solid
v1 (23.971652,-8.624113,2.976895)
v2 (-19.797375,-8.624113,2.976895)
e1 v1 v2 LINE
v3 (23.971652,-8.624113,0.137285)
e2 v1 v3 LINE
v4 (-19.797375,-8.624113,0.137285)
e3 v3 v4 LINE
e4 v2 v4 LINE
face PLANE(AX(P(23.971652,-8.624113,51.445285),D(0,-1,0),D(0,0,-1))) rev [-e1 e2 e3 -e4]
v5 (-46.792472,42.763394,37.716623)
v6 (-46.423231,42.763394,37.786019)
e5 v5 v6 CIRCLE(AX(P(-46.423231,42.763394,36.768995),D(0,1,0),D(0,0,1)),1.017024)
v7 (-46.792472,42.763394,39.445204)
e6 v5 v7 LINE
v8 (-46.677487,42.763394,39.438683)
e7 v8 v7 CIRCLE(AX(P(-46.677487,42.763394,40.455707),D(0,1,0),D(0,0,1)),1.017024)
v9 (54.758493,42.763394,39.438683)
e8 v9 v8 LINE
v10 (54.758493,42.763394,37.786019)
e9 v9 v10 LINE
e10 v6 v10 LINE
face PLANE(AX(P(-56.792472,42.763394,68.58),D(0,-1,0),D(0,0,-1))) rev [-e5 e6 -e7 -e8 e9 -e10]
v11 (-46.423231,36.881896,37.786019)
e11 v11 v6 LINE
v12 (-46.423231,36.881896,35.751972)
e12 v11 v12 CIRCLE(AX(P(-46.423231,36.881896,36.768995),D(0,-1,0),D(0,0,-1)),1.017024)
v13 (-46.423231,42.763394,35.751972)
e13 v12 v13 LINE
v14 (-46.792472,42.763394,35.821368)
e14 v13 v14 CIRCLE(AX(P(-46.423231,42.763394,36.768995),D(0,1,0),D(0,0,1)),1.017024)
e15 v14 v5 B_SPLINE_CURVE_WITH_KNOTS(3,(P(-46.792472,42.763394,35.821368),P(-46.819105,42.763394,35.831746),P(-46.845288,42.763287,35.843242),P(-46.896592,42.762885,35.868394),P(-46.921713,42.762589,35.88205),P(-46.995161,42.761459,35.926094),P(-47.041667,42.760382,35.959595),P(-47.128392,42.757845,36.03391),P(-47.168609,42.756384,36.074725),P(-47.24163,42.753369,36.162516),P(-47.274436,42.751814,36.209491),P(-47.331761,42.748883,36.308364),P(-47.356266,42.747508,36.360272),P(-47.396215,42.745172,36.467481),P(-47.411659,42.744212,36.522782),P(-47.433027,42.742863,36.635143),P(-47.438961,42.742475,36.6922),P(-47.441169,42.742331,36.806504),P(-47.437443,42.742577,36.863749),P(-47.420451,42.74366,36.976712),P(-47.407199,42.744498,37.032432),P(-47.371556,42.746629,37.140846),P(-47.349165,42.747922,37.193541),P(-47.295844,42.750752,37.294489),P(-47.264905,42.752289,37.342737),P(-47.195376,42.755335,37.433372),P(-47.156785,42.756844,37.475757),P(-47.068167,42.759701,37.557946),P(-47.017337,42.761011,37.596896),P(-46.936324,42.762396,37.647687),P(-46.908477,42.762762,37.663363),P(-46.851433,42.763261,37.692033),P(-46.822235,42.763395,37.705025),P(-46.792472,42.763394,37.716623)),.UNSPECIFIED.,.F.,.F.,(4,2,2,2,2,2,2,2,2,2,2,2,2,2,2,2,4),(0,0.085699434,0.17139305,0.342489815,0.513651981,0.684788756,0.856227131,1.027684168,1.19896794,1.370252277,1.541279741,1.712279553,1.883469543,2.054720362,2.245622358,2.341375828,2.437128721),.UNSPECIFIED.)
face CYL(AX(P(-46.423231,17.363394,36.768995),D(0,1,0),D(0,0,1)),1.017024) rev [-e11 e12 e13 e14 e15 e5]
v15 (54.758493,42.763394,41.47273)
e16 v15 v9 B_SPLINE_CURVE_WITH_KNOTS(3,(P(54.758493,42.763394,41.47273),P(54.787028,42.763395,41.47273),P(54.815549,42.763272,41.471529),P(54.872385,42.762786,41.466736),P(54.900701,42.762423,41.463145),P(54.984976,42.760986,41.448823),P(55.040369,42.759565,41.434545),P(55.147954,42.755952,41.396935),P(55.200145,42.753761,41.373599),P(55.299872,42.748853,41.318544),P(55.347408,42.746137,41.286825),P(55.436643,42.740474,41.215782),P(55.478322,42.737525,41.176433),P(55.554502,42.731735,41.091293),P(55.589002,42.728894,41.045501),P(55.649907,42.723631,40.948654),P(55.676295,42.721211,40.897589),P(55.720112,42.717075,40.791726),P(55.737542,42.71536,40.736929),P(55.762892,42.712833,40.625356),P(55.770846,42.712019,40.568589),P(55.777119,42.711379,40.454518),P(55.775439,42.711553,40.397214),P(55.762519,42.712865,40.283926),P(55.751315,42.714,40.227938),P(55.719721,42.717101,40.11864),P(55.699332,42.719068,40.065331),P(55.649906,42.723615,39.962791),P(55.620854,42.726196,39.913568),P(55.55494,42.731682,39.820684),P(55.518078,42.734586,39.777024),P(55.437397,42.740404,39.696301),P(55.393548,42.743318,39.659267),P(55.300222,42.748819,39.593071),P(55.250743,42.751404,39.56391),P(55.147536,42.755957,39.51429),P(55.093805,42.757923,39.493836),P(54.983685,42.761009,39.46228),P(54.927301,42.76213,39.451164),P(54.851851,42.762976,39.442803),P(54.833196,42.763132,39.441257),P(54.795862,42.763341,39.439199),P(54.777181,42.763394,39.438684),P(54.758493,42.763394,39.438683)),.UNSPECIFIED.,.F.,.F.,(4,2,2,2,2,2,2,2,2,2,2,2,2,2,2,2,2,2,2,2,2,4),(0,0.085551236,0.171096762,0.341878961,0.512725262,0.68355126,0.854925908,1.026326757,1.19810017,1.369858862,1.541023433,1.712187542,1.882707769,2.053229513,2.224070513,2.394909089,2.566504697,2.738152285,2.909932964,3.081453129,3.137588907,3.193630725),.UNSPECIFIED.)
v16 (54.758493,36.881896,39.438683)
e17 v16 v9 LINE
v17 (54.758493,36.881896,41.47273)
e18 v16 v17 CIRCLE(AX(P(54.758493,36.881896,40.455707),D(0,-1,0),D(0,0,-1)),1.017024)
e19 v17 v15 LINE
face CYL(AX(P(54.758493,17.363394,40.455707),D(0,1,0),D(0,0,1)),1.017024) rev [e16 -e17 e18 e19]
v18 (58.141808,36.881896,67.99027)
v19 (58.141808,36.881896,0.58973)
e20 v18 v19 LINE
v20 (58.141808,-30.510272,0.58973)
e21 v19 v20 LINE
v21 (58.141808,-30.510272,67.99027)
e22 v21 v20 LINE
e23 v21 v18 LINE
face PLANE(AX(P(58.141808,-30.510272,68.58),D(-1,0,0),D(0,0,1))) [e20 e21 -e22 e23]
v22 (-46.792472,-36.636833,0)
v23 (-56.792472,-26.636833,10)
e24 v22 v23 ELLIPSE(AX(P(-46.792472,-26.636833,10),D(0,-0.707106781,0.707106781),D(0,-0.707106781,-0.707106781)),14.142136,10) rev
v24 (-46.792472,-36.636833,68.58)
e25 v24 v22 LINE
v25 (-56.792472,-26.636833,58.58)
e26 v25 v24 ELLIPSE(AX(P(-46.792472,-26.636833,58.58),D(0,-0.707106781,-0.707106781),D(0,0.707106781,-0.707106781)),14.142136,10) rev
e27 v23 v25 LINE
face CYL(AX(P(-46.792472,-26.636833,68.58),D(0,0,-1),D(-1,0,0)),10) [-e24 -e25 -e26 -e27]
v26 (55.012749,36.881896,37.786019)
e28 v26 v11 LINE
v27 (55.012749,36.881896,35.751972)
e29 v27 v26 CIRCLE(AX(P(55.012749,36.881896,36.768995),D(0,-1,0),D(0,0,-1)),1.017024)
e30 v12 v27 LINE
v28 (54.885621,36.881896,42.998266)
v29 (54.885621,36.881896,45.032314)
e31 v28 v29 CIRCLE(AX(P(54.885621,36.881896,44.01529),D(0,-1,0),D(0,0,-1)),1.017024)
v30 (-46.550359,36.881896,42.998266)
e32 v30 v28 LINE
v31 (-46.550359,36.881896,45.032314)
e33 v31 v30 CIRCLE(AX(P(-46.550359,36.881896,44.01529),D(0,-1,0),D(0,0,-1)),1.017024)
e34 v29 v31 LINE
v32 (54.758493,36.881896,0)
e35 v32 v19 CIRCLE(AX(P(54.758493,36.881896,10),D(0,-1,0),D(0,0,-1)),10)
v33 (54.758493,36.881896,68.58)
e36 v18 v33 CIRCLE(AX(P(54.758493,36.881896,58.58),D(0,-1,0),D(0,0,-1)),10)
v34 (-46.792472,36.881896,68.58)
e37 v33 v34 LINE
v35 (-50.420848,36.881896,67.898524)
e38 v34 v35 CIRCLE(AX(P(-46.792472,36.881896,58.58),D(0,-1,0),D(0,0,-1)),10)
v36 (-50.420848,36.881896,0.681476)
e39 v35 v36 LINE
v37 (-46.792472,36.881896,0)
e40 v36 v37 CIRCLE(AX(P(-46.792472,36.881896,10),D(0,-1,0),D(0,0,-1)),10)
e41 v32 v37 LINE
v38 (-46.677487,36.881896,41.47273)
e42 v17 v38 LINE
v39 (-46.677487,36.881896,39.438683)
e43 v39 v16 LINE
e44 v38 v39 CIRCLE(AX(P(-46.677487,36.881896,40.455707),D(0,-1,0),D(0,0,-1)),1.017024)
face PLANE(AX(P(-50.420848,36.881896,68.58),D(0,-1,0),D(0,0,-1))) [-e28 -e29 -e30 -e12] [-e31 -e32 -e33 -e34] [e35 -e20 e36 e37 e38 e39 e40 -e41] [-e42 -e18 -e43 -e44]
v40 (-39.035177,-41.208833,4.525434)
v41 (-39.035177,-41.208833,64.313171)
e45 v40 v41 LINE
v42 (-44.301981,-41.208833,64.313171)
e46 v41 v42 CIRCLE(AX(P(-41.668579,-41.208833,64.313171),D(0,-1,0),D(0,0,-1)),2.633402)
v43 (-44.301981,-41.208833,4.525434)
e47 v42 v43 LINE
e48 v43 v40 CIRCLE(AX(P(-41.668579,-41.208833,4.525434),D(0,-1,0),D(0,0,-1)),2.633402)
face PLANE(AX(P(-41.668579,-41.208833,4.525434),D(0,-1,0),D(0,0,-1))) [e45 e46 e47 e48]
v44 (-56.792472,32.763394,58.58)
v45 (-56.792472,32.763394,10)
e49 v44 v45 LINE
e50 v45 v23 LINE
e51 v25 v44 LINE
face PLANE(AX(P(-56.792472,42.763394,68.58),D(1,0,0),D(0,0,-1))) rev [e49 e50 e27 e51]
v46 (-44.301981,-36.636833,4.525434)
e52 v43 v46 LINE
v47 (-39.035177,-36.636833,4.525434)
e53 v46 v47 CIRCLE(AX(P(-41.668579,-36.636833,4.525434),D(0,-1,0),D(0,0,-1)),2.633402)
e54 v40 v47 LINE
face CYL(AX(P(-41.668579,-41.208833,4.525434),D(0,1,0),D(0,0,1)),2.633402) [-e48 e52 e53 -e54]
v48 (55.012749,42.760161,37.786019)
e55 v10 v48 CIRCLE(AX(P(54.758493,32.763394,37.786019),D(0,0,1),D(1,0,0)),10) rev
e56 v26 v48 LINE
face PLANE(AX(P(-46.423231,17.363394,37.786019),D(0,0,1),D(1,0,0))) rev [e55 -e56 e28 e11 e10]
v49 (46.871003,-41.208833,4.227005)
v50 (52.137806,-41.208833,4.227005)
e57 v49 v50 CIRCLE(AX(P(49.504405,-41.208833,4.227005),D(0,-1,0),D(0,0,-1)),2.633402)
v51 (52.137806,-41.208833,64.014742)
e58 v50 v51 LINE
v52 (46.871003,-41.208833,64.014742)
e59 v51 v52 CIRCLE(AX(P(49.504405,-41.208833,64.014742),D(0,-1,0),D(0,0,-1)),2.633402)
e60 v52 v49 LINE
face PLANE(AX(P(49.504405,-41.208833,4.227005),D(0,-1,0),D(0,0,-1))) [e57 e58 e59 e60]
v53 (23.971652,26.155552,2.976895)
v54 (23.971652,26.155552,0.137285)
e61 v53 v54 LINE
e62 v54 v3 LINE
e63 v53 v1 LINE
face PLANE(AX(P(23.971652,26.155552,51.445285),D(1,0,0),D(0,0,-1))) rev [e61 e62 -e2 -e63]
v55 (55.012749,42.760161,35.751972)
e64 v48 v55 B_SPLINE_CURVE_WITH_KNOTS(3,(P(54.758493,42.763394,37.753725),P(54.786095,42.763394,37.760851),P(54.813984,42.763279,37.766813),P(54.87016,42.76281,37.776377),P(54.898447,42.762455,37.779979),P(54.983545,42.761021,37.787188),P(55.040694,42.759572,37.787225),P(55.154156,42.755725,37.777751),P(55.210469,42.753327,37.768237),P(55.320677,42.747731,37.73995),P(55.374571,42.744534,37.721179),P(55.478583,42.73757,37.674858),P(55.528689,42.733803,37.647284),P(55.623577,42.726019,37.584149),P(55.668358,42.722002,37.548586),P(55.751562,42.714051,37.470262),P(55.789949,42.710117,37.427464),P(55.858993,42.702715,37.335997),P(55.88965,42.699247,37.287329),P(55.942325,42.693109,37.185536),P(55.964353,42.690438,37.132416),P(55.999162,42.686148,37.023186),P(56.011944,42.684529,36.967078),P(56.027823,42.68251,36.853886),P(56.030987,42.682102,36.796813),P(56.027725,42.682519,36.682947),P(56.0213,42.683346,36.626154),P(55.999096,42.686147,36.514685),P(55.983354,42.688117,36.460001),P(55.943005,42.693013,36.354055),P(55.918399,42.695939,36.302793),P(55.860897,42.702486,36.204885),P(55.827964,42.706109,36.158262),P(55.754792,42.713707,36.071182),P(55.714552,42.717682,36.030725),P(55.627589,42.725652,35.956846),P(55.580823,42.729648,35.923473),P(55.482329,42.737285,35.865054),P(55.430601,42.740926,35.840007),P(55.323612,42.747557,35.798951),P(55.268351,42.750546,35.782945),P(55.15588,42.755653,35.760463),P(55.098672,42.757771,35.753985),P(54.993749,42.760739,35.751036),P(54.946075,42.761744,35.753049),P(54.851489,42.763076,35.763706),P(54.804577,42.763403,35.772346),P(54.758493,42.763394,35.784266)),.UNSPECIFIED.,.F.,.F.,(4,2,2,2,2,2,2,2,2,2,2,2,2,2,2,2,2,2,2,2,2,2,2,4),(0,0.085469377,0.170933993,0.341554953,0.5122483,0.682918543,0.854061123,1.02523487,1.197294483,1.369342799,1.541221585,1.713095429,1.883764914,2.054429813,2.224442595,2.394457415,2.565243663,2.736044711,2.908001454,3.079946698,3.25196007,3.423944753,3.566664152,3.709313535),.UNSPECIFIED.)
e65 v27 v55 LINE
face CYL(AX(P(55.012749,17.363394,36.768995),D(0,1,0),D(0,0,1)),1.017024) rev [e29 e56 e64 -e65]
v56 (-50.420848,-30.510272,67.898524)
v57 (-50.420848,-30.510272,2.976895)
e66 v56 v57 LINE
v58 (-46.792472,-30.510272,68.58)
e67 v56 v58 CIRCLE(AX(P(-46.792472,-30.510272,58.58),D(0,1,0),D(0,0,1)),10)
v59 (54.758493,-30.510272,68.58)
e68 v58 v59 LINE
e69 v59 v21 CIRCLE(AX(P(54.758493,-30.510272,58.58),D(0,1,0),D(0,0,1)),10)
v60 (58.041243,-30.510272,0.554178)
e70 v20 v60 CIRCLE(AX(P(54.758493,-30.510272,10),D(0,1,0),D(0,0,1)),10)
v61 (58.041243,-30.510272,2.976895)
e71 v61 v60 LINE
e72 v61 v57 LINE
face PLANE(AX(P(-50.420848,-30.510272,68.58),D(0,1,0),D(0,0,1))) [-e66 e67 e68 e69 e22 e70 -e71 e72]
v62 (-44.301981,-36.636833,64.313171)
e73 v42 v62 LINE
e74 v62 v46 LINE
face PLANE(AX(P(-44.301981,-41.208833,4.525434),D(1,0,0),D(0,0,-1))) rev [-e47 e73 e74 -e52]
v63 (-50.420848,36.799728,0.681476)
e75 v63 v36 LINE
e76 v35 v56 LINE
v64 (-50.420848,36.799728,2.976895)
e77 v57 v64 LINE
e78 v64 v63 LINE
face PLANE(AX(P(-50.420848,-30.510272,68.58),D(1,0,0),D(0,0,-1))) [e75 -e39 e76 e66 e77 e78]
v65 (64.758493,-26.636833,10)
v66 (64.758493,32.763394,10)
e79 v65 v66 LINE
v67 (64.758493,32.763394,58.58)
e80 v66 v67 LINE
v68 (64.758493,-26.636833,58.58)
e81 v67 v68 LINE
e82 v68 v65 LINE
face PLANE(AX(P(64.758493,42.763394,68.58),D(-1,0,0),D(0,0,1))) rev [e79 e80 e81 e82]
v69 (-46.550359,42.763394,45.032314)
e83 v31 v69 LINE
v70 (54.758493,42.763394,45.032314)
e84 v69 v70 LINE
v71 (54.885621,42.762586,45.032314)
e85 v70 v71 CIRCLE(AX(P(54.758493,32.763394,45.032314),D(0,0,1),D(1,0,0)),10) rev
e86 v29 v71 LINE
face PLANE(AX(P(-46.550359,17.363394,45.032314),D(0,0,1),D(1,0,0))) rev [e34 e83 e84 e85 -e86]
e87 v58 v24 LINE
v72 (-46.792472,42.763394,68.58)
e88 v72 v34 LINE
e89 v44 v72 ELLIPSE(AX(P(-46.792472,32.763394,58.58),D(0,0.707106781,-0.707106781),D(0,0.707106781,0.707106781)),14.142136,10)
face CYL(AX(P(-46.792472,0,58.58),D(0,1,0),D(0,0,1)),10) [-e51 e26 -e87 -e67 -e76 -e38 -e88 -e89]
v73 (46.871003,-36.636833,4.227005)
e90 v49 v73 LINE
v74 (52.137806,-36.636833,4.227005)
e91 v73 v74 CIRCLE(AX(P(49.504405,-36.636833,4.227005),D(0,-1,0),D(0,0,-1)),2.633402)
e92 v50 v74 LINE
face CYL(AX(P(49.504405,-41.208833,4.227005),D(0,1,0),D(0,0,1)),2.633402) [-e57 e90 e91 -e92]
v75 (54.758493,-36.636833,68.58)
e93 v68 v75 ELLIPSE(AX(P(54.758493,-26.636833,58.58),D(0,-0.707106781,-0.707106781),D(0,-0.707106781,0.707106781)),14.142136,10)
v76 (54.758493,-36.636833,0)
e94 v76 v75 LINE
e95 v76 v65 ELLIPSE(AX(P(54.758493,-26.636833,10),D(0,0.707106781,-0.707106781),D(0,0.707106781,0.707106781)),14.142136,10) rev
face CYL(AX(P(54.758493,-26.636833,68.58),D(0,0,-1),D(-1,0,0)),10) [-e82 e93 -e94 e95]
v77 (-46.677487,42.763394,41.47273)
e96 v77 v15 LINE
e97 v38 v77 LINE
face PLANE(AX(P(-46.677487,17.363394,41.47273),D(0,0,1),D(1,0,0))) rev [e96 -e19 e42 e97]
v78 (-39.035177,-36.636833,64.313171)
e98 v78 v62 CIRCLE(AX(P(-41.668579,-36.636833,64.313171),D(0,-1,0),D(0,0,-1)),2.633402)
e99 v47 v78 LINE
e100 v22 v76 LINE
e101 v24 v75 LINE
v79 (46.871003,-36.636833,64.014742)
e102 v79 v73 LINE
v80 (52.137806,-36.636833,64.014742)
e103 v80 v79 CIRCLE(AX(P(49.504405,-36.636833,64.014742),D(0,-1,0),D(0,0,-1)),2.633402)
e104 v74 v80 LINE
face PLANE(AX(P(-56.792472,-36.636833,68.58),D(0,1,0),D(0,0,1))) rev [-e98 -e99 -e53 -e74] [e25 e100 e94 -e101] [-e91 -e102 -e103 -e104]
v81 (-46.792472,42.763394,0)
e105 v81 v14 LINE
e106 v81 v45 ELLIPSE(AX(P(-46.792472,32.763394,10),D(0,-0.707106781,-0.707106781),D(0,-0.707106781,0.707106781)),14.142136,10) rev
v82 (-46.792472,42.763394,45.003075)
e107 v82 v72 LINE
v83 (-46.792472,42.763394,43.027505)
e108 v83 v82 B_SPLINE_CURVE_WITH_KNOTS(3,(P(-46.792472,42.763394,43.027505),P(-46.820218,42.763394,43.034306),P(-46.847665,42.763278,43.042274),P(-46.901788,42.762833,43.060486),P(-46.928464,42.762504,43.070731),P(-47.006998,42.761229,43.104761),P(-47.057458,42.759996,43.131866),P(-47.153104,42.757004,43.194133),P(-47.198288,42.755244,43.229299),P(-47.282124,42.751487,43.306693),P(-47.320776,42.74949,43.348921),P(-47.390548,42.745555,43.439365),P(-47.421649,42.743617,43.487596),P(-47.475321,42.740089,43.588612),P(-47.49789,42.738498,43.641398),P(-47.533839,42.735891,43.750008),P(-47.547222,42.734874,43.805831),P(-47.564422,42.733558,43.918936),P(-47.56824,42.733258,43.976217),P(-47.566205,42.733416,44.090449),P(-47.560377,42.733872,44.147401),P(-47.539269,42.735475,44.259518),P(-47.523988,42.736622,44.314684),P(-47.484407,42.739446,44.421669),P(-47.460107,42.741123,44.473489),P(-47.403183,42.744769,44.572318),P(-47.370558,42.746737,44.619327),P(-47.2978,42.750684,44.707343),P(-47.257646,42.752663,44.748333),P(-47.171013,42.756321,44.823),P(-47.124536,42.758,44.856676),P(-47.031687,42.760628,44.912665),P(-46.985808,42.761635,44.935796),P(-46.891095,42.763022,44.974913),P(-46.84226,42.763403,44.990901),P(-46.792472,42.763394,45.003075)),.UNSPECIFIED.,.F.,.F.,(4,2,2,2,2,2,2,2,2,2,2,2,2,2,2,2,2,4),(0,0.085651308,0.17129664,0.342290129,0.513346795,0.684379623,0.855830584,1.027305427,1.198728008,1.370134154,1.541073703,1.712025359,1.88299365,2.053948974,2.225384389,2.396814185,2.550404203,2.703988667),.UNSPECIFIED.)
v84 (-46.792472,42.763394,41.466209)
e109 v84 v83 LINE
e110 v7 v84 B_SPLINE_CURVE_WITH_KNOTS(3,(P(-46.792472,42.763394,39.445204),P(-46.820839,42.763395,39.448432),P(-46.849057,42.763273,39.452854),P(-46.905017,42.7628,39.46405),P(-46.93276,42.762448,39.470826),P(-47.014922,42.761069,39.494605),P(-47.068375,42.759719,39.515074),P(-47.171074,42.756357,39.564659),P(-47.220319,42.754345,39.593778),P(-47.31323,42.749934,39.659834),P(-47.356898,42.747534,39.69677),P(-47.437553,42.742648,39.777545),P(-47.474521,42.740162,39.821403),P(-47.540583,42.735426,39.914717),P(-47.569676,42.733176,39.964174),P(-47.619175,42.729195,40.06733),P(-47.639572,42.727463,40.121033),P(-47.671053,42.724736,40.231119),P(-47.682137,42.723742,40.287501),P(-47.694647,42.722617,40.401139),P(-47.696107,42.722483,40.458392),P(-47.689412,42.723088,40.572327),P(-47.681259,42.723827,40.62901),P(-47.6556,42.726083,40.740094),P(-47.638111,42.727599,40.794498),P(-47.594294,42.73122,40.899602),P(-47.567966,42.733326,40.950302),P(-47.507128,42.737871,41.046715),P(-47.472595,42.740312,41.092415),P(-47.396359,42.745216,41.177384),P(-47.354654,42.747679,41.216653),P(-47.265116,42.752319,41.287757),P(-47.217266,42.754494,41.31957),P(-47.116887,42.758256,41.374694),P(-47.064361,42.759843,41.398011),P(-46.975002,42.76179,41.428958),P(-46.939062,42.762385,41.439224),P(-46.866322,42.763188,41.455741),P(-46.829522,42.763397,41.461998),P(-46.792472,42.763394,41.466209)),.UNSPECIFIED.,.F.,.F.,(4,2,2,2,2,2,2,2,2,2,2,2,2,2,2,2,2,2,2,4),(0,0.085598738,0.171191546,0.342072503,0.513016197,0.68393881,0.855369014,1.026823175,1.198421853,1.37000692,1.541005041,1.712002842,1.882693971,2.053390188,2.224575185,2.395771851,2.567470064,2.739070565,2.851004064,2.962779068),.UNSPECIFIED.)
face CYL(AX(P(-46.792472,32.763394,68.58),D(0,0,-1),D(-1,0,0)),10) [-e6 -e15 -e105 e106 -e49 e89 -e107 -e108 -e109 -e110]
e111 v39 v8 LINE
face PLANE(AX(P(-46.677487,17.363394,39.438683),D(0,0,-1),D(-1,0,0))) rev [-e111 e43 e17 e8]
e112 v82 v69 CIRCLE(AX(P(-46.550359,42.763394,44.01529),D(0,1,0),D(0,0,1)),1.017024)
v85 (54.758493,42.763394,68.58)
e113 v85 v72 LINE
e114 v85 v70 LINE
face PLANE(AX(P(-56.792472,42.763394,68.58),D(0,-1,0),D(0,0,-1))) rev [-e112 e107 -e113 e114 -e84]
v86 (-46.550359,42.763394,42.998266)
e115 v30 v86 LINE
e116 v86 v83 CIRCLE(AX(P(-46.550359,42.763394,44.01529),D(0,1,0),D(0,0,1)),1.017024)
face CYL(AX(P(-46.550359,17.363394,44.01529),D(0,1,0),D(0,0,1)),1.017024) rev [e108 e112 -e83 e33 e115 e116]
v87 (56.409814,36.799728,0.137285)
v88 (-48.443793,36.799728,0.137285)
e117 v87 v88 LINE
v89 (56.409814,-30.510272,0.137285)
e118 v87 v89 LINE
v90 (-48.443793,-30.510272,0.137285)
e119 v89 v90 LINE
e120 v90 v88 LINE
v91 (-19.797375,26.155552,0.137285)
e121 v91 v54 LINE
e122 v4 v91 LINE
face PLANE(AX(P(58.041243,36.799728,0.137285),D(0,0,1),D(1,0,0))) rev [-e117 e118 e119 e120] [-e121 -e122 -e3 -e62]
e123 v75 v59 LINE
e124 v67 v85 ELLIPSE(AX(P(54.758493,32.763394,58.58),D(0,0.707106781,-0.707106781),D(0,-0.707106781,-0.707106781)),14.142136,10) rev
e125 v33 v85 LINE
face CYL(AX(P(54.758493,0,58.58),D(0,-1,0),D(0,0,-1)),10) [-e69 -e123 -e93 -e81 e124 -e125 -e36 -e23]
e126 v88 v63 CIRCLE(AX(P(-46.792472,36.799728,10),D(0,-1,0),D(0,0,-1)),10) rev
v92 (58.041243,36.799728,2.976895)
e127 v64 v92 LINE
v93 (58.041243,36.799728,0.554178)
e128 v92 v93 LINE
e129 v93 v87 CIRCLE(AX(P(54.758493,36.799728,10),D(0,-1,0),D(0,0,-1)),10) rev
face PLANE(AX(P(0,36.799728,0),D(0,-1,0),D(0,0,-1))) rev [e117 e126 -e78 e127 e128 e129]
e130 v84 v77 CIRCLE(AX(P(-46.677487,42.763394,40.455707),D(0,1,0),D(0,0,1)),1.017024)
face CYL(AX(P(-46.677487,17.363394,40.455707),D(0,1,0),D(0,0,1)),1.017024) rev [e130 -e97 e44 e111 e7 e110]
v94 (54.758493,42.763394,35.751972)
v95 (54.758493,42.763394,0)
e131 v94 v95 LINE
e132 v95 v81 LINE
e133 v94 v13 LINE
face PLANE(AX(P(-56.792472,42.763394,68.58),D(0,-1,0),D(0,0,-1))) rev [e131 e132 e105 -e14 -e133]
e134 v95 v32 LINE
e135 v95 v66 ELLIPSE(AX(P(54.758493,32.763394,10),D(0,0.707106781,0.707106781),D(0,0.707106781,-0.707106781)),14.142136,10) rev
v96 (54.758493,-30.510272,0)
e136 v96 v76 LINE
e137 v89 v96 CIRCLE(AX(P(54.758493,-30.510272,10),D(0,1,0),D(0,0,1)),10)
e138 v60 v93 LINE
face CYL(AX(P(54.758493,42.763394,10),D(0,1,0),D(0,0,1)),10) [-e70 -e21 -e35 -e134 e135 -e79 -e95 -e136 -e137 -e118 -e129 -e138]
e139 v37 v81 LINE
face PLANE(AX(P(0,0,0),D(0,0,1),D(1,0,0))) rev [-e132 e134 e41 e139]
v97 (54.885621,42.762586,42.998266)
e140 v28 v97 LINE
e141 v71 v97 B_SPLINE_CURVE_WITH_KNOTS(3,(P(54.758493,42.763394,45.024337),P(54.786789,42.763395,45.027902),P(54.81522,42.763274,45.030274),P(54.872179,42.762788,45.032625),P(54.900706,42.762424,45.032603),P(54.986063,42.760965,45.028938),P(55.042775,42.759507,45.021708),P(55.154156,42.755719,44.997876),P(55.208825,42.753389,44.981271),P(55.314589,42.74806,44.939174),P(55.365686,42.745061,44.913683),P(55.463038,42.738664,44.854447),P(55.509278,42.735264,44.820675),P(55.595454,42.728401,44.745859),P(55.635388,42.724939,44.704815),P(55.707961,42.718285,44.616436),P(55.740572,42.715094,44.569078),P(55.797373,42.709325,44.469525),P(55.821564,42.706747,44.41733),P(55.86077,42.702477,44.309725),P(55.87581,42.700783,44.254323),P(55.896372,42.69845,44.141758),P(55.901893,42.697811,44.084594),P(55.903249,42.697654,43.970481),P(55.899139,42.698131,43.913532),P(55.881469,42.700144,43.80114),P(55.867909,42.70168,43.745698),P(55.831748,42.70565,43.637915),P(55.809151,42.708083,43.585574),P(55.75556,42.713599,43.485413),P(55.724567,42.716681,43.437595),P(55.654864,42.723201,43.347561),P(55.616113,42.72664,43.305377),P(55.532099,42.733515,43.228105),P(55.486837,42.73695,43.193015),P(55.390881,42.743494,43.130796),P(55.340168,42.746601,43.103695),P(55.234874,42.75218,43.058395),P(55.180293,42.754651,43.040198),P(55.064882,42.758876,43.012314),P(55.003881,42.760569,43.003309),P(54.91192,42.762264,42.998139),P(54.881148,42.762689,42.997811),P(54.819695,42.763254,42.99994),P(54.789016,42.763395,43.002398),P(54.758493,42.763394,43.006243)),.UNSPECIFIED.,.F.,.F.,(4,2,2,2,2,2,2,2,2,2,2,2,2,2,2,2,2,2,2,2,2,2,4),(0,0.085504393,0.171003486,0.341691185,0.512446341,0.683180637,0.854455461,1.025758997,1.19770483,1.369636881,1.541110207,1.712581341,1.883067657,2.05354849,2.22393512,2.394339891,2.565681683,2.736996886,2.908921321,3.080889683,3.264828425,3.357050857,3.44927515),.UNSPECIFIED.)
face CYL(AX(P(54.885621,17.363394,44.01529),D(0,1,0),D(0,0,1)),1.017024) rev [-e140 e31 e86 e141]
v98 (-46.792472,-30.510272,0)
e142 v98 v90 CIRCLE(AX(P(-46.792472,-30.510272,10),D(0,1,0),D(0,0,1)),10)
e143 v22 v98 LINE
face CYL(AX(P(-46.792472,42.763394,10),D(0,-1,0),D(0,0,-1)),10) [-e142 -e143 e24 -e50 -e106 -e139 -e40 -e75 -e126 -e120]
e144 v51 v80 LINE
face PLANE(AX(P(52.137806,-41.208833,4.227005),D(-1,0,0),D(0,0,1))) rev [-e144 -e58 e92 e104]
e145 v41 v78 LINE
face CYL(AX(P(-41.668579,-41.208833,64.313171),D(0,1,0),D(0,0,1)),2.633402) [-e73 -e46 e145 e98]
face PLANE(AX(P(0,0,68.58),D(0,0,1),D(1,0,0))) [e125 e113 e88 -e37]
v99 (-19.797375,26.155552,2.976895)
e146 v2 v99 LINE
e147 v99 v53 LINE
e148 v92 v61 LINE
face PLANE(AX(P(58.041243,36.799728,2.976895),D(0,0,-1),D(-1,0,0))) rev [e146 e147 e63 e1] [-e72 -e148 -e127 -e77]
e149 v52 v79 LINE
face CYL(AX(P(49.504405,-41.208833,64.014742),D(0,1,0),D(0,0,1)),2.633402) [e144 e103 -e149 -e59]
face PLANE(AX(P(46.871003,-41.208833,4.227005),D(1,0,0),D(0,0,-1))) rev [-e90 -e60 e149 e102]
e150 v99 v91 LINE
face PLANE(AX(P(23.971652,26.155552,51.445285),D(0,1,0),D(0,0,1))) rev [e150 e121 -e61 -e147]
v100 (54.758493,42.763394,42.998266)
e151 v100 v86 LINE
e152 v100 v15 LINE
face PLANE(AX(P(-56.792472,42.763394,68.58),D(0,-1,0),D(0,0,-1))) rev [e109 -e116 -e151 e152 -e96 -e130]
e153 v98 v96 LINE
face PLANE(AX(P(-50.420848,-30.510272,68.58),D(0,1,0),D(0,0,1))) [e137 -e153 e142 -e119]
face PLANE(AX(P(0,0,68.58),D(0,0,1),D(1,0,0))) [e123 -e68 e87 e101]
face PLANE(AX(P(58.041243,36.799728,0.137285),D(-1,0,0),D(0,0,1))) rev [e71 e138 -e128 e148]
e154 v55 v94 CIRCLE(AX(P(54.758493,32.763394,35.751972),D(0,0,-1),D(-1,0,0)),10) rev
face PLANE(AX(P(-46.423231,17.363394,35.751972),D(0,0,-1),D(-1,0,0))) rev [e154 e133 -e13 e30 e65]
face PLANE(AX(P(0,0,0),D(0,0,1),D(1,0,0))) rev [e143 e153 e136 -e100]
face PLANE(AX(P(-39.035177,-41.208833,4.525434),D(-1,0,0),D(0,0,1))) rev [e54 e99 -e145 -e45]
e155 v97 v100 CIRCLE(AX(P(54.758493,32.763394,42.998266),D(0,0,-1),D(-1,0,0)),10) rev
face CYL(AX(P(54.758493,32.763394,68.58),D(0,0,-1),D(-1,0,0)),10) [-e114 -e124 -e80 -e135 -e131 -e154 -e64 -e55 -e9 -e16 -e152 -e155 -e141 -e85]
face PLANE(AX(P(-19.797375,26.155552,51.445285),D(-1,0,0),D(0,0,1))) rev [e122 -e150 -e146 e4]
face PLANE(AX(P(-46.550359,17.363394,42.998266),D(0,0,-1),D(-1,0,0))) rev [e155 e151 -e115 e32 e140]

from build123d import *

# Parameters (mm, degrees)
IZIM1_W                     = 121.550964813
IZIM1_H                     = 79.400227015
IZIM1_W_2                   = 108.562656073
IZIM1_H_2                   = 67.392167991
Y_KSEKLIK_EKSTR_ZYON1_DEPTH = 68.58
IZIM2_W                     = 108.665778405
IZIM2_H                     = 2.839609685
Y_KSEKLIK_EKSTR_ZYON3_DEPTH = 67.31
IZIM4_W                     = 43.769026383
IZIM4_H                     = 34.779664875
KES_EKSTR_ZYON3_DEPTH       = 51.308
RADYUS1_R                   = 10
RADYUS2_R                   = 10
KES_EKSTR_ZYON6_DEPTH       = 25.4
Y_KSEKLIK_EKSTR_ZYON4_DEPTH = 4.572


with BuildPart() as part:
    # Çizim1 → Yükseklik-Ekstrüzyon1 (new body)
    with BuildSketch(Plane.XY):
        with Locations((3.983010787, 3.063280364)):
            Rectangle(IZIM1_W, IZIM1_H)
        with Locations((3.860479571, 3.185811577)):
            Rectangle(IZIM1_W_2, IZIM1_H_2, mode=Mode.SUBTRACT)
    extrude(amount=Y_KSEKLIK_EKSTR_ZYON1_DEPTH)

    # Çizim2 → Yükseklik-Ekstrüzyon3 (add)
    with BuildSketch(Plane(origin=(0, -30.510272418, 0), x_dir=(1, 0, 0), z_dir=(0, 1, 0))):
        with Locations((3.70835341, -1.557090266)):
            Rectangle(IZIM2_W, IZIM2_H)
    extrude(amount=Y_KSEKLIK_EKSTR_ZYON3_DEPTH)

    # Çizim4 → Kes-Ekstrüzyon3 (cut)
    with BuildSketch(Plane(origin=(0, 0, 0.137285424), x_dir=(-1, 0, 0), z_dir=(0, 0, -1))):
        with Locations((-2.08713858, 8.765719608)):
            Rectangle(IZIM4_W, IZIM4_H)
    extrude(amount=-KES_EKSTR_ZYON3_DEPTH, mode=Mode.SUBTRACT)

    # Radyus1
    # the kernel refuses this fillet: 10 mm, written as the material it takes off along each edge
    with BuildSketch(Plane(origin=(64.758493193, -36.636833144, -25), x_dir=(0, 1, 0), z_dir=(0, 0, 1)), Plane(origin=(64.758493193, 42.763393871, -25), x_dir=(-1, 0, 0), z_dir=(0, 0, 1))) as radyus1_piece_1:
        with BuildLine():
            CenterArc((RADYUS1_R, RADYUS1_R), RADYUS1_R, 180, 90)
            Line((0, RADYUS1_R), (0, 0))
            Line((0, 0), (RADYUS1_R, 0))
        make_face()
    extrude(amount=118.58, mode=Mode.SUBTRACT)
    with BuildSketch(Plane(origin=(64.758493193, 67.763393871, 68.58), x_dir=(0, 0, -1), z_dir=(0, -1, 0))) as radyus1_piece_2:
        with BuildLine():
            CenterArc((RADYUS1_R, -RADYUS1_R), RADYUS1_R, 90, 90)
            Line((0, -RADYUS1_R), (0, 0))
            Line((0, 0), (RADYUS1_R, 0))
        make_face()
    extrude(amount=129.400227015, mode=Mode.SUBTRACT)
    with BuildSketch(Plane(origin=(64.758493193, 67.763393871, 0), x_dir=(0, 0, 1), z_dir=(0, -1, 0))) as radyus1_piece_3:
        with BuildLine():
            CenterArc((RADYUS1_R, RADYUS1_R), RADYUS1_R, 180, 90)
            Line((0, RADYUS1_R), (0, 0))
            Line((0, 0), (RADYUS1_R, 0))
        make_face()
    extrude(amount=129.400227015, mode=Mode.SUBTRACT)

    # Radyus2
    # the kernel refuses this fillet: 10 mm, written as the material it takes off along each edge
    with BuildSketch(Plane(origin=(-56.79247162, 42.763393871, -25), x_dir=(1, 0, 0), z_dir=(0, 0, 1)), Plane(origin=(-56.79247162, -36.636833144, -25), x_dir=(0, 1, 0), z_dir=(0, 0, 1))) as radyus2_piece_1:
        with BuildLine():
            CenterArc((RADYUS2_R, -RADYUS2_R), RADYUS2_R, 90, 90)
            Line((0, -RADYUS2_R), (0, 0))
            Line((0, 0), (RADYUS2_R, 0))
        make_face()
    extrude(amount=118.58, mode=Mode.SUBTRACT)
    with BuildSketch(Plane(origin=(-56.79247162, -61.636833144, 68.58), x_dir=(1, 0, 0), z_dir=(0, 1, 0))) as radyus2_piece_2:
        with BuildLine():
            CenterArc((RADYUS2_R, RADYUS2_R), RADYUS2_R, 180, 90)
            Line((0, RADYUS2_R), (0, 0))
            Line((0, 0), (RADYUS2_R, 0))
        make_face()
    extrude(amount=129.400227015, mode=Mode.SUBTRACT)
    with BuildSketch(Plane(origin=(-56.79247162, -61.636833144, 0), x_dir=(1, 0, 0), z_dir=(0, 1, 0))) as radyus2_piece_3:
        with BuildLine():
            CenterArc((RADYUS2_R, -RADYUS2_R), RADYUS2_R, 90, 90)
            Line((0, -RADYUS2_R), (0, 0))
            Line((0, 0), (RADYUS2_R, 0))
        make_face()
    extrude(amount=129.400227015, mode=Mode.SUBTRACT)

    # Çizim5 → Kes-Ekstrüzyon6 (cut)
    with BuildSketch(Plane(origin=(0, 42.763393871, 0), x_dir=(1, 0, 0), z_dir=(0, 1, 0))):
        with BuildLine():
            Line((-46.423230595, -35.751971692), (55.012749139, -35.751971692))
            ThreePointArc((55.012749139, -35.751971692), (56.029772925, -36.768995478), (55.012749139, -37.786019263))
            Line((55.012749139, -37.786019263), (-46.423230595, -37.786019263))
            ThreePointArc((-46.423230595, -37.786019263), (-47.44025438, -36.768995478), (-46.423230595, -35.751971692))
        make_face()
        with BuildLine():
            Line((-46.550358568, -42.998266165), (54.885621166, -42.998266165))
            ThreePointArc((54.885621166, -42.998266165), (55.902644952, -44.015289951), (54.885621166, -45.032313737))
            Line((54.885621166, -45.032313737), (-46.550358568, -45.032313737))
            ThreePointArc((-46.550358568, -45.032313737), (-47.567382354, -44.015289951), (-46.550358568, -42.998266165))
        make_face()
        with BuildLine():
            Line((-46.677486541, -39.438682915), (54.758493193, -39.438682915))
            ThreePointArc((54.758493193, -39.438682915), (55.775516978, -40.455706701), (54.758493193, -41.472730487))
            Line((54.758493193, -41.472730487), (-46.677486541, -41.472730487))
            ThreePointArc((-46.677486541, -41.472730487), (-47.694510327, -40.455706701), (-46.677486541, -39.438682915))
        make_face()
    extrude(amount=-KES_EKSTR_ZYON6_DEPTH, mode=Mode.SUBTRACT)

    # Çizim6 → Yükseklik-Ekstrüzyon4 (add)
    with BuildSketch(Plane(origin=(0, -36.636833144, 0), x_dir=(-1, 0, 0), z_dir=(0, -1, 0))):
        with BuildLine():
            Line((-46.87100271, -4.227005014), (-46.87100271, -64.014742354))
            ThreePointArc((-46.87100271, -64.014742354), (-49.504404567, -66.64814421), (-52.137806423, -64.014742354))
            Line((-52.137806423, -64.014742354), (-52.137806423, -4.227005014))
            ThreePointArc((-52.137806423, -4.227005014), (-49.504404567, -1.593603158), (-46.87100271, -4.227005014))
        make_face()
        with BuildLine():
            Line((44.301980946, -4.525434052), (44.301980946, -64.313171393))
            ThreePointArc((44.301980946, -64.313171393), (41.66857909, -66.946573249), (39.035177234, -64.313171393))
            Line((39.035177234, -64.313171393), (39.035177234, -4.525434052))
            ThreePointArc((39.035177234, -4.525434052), (41.66857909, -1.892032196), (44.301980946, -4.525434052))
        make_face()
    extrude(amount=Y_KSEKLIK_EKSTR_ZYON4_DEPTH)


solid = part.part
